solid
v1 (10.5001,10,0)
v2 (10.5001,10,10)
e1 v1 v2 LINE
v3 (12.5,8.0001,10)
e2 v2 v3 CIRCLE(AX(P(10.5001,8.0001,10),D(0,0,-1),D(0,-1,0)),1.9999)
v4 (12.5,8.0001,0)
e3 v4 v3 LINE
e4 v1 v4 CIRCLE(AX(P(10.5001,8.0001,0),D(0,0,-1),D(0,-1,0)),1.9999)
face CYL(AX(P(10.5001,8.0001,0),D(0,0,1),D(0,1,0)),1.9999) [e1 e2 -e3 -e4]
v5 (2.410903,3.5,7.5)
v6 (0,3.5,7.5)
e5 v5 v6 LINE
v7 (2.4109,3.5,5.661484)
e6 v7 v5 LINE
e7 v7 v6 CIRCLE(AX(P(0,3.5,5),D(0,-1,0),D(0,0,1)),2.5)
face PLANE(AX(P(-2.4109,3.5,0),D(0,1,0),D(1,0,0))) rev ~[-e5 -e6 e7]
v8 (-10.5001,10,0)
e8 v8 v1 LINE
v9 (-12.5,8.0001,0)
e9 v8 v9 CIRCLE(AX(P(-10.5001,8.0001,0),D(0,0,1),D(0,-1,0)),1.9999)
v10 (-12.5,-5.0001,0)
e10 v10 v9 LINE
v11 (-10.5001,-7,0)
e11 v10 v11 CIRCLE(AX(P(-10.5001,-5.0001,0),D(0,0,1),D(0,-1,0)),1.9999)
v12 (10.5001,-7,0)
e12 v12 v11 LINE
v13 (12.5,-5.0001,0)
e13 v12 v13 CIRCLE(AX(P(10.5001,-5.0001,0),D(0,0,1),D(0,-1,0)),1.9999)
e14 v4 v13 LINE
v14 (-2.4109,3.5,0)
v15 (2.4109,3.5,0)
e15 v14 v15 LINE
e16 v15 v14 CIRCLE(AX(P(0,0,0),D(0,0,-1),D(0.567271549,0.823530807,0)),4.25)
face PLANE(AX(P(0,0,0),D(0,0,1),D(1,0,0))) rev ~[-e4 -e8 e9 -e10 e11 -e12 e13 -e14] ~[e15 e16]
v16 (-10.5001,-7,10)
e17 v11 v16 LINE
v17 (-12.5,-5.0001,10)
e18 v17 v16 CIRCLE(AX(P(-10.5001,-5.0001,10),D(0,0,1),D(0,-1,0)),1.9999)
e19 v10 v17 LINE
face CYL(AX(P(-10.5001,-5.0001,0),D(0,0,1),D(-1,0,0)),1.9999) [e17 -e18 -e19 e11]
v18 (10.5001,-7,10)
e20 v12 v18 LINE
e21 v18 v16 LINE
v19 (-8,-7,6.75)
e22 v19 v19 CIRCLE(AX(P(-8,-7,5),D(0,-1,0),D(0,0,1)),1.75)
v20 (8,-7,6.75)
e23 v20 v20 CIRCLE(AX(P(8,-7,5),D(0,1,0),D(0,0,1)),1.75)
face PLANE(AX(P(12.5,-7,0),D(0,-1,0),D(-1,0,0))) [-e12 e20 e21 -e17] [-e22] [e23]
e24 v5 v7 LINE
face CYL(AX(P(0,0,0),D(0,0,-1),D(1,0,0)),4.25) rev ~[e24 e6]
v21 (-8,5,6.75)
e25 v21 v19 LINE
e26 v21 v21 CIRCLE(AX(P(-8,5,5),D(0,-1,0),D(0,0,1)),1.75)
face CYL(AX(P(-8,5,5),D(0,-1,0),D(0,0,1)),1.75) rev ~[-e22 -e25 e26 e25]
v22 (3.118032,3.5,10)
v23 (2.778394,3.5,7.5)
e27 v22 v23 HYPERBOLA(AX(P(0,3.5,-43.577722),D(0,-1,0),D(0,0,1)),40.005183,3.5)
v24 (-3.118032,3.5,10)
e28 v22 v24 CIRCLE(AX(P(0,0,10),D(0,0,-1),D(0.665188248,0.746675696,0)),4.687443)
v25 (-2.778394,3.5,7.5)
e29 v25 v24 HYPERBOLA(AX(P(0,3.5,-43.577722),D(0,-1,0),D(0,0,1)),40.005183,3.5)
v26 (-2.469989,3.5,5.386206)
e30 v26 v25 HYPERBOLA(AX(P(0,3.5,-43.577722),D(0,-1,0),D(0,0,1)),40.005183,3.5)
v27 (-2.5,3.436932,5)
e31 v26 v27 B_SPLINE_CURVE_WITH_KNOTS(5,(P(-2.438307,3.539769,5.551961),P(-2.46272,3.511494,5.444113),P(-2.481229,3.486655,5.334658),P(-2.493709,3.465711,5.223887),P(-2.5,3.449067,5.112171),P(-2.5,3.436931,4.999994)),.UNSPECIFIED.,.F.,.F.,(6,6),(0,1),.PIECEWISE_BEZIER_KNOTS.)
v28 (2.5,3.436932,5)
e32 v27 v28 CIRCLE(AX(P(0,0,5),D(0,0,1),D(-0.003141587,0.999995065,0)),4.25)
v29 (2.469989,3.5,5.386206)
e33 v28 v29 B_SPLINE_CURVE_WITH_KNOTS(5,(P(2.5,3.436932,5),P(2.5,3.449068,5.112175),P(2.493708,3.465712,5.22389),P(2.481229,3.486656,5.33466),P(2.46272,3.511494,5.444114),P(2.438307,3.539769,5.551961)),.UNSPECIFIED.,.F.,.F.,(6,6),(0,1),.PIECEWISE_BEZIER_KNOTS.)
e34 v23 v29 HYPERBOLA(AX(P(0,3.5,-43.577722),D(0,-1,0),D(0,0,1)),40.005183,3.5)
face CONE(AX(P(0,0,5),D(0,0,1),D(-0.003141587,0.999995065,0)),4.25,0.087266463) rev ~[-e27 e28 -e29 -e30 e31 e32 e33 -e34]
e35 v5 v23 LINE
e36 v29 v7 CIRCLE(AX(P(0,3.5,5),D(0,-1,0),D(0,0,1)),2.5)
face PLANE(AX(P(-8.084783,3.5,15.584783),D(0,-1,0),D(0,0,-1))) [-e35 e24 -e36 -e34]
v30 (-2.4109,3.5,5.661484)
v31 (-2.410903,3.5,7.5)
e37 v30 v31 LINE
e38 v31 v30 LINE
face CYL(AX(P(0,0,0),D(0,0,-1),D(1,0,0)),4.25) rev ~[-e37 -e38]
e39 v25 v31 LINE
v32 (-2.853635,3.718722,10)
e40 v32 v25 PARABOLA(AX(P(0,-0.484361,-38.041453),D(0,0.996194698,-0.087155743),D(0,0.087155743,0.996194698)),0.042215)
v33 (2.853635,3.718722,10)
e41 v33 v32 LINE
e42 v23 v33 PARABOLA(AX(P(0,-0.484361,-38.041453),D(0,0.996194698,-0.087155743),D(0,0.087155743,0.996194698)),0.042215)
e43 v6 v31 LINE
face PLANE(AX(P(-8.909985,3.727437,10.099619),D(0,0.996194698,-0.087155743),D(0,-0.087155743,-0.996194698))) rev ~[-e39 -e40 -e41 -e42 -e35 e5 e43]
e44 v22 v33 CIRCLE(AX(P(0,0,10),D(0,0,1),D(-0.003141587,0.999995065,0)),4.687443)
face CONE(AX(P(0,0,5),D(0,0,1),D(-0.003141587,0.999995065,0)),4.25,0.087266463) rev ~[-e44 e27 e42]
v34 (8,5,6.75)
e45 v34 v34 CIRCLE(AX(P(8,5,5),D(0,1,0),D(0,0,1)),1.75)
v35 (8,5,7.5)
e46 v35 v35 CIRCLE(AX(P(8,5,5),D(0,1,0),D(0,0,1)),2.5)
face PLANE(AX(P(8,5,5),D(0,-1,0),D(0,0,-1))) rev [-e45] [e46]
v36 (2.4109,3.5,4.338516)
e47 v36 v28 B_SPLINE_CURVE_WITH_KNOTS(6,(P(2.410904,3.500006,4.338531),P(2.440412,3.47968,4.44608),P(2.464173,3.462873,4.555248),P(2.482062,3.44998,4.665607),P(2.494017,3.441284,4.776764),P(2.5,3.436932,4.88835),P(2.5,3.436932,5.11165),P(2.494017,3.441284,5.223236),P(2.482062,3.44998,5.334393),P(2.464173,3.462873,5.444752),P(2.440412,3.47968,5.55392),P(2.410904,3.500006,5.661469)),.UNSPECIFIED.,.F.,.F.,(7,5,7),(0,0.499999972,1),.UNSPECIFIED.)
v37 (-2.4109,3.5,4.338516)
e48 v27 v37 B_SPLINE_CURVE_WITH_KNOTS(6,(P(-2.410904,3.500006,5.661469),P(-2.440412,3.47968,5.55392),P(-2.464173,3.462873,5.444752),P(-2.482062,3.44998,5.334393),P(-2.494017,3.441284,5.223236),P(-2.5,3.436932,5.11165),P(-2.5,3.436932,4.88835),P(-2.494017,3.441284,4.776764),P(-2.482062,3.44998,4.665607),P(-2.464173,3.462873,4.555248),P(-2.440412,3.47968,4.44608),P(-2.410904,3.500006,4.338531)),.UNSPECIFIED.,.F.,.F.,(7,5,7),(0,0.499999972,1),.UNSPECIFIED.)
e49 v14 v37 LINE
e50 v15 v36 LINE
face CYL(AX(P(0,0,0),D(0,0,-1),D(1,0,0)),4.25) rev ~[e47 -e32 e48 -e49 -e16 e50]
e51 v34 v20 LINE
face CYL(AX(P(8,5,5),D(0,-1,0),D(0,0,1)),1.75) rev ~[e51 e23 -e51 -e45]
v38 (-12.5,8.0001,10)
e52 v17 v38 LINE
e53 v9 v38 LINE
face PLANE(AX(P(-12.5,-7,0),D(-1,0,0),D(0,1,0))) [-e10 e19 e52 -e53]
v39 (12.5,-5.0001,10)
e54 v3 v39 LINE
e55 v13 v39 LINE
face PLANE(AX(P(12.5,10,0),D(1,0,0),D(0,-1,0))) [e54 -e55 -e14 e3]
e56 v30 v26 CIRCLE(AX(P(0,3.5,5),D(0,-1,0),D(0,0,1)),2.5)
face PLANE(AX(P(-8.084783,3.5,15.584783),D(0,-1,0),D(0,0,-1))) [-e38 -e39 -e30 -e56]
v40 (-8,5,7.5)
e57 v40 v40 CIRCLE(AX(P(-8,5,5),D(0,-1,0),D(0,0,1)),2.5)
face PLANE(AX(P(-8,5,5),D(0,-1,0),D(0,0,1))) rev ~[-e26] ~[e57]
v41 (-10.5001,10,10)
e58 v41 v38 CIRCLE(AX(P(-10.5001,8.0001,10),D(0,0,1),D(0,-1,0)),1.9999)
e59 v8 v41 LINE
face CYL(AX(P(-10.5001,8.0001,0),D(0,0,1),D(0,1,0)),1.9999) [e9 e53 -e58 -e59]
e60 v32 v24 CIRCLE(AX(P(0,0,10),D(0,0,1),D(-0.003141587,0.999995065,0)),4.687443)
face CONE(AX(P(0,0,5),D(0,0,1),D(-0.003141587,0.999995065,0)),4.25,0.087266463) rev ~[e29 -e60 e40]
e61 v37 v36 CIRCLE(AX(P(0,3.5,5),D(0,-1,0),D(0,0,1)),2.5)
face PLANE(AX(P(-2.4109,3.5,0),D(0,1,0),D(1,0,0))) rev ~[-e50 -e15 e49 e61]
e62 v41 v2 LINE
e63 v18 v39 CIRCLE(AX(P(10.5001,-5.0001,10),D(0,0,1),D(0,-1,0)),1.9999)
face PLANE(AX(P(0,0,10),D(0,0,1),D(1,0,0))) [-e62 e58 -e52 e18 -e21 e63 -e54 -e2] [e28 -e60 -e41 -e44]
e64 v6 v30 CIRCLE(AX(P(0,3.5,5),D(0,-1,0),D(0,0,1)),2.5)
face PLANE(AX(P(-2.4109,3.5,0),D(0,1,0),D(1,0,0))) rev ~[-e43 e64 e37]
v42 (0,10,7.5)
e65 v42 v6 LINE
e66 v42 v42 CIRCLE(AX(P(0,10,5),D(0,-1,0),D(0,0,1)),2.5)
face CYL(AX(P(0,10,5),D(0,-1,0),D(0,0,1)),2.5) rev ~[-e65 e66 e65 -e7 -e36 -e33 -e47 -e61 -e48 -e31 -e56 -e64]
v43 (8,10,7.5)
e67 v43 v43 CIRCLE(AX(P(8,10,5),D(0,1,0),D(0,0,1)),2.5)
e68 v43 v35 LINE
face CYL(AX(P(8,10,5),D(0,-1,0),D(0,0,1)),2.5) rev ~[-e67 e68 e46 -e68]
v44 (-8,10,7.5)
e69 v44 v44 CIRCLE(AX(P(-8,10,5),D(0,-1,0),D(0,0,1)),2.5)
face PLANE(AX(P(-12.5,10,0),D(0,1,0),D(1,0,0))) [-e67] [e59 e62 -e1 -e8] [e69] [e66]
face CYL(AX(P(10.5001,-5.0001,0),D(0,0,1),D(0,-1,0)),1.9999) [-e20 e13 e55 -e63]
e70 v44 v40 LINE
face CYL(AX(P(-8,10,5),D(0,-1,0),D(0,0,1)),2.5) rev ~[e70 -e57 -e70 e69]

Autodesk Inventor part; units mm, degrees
ref_plane "YZ Plane" through (0, 0, 0) normal (1, 0, 0) x (0, 1, 0)
ref_plane "XZ Plane" through (0, 0, 0) normal (0, 1, 0) x (-1, 0, 0)
ref_plane "XY Plane" through (0, 0, 0) normal (0, 0, 1) x (1, 0, 0)
sketch "Sketch1" plane through (0, 0, 0) normal (0, 0, 1) x (1, 0, 0)
  circle A0 centre (0, 0) radius 4.25
  line L0 (-2.4109, 3.5) -> (2.4109, 3.5)
  line L1 (-12.5, 10) -> (12.5, 10)
  line L2 (12.5, 10) -> (12.5, -7)
  line L3 (12.5, -7) -> (-12.5, -7)
  line L4 (-12.5, -7) -> (-12.5, 10)
  dimension "d0" = 8.5
  dimension "d1" = 3.5
  dimension "d2" = 25
  dimension "d3" = 12.5
  dimension "d4" = 17
  dimension "d5" = 10
extrude "Extrusion1" add sketch "Sketch1" along normal blind 10 contours L0 A0 | L1 L2 L3 L4 picked at (-0.1705, 3.7397)
sketch "Sketch2" plane through (-12.5, 10, 0) normal (0, 1, 0) x (1, 0, 0)
  line L0 (25, -10) -> (0, -10) projected
  line L1 (25, 0) -> (0, 0) projected
  line L2 (0, 0) -> (0, -10) projected
  point P0 (12.5, 0)
  point P1 (4.5, -5)
  dimension "d8" = 10
  dimension "d9" = 5
  dimension "d18" = 8
hole "Hole1" at (-8, 10, 5) direction (0, -1, 0) diameter 3.5 depth 17 counterbore diameter 5 counterbore depth 5
mirror "Mirror1" about plane through (0, 0, 0) normal (1, 0, 0) of "Hole1"
sketch "Sketch3" plane through (-12.5, 10, 0) normal (0, 1, 0) x (1, 0, 0)
  line L0 (25, -10) -> (0, -10) projected
  line L1 (25, 0) -> (0, 0) projected
  line L2 (25, 0) -> (25, -10) projected
  line L3 (0, 0) -> (0, -10) projected
  point P0 (12.5, 0)
  point P1 (12.5, -5)
  dimension "d19" = 10
  dimension "d20" = 5
  dimension "d21" = 25
  dimension "d22" = 12.5
hole "Hole2" at (0, 10, 5) direction (0, -1, 0) diameter 5 end up to surface
fillet "Fillet1" radius 2 4 edges at (-12.5, 10, 5) (12.5, 10, 5) (12.5, -7, 5) (-12.5, -7, 5)
chamfer "Chamfer1" distance 5 angle 5 1 edges at (0, -4.25, 10)
chamfer "Chamfer2" distance 2.5 angle 5 1 edges at (0, 3.5, 10) measured on face at (0, 3.5, 9.1667)
equation "\"d3\" = 0.5 * d2"
equation "\"d9\" = 0.5 * d8"
equation "\"d20\" = 0.5 * d19"
equation "\"d22\" = 0.5 * d21"
properties part number "pendulum_adapter" material "ABS Plastic"
